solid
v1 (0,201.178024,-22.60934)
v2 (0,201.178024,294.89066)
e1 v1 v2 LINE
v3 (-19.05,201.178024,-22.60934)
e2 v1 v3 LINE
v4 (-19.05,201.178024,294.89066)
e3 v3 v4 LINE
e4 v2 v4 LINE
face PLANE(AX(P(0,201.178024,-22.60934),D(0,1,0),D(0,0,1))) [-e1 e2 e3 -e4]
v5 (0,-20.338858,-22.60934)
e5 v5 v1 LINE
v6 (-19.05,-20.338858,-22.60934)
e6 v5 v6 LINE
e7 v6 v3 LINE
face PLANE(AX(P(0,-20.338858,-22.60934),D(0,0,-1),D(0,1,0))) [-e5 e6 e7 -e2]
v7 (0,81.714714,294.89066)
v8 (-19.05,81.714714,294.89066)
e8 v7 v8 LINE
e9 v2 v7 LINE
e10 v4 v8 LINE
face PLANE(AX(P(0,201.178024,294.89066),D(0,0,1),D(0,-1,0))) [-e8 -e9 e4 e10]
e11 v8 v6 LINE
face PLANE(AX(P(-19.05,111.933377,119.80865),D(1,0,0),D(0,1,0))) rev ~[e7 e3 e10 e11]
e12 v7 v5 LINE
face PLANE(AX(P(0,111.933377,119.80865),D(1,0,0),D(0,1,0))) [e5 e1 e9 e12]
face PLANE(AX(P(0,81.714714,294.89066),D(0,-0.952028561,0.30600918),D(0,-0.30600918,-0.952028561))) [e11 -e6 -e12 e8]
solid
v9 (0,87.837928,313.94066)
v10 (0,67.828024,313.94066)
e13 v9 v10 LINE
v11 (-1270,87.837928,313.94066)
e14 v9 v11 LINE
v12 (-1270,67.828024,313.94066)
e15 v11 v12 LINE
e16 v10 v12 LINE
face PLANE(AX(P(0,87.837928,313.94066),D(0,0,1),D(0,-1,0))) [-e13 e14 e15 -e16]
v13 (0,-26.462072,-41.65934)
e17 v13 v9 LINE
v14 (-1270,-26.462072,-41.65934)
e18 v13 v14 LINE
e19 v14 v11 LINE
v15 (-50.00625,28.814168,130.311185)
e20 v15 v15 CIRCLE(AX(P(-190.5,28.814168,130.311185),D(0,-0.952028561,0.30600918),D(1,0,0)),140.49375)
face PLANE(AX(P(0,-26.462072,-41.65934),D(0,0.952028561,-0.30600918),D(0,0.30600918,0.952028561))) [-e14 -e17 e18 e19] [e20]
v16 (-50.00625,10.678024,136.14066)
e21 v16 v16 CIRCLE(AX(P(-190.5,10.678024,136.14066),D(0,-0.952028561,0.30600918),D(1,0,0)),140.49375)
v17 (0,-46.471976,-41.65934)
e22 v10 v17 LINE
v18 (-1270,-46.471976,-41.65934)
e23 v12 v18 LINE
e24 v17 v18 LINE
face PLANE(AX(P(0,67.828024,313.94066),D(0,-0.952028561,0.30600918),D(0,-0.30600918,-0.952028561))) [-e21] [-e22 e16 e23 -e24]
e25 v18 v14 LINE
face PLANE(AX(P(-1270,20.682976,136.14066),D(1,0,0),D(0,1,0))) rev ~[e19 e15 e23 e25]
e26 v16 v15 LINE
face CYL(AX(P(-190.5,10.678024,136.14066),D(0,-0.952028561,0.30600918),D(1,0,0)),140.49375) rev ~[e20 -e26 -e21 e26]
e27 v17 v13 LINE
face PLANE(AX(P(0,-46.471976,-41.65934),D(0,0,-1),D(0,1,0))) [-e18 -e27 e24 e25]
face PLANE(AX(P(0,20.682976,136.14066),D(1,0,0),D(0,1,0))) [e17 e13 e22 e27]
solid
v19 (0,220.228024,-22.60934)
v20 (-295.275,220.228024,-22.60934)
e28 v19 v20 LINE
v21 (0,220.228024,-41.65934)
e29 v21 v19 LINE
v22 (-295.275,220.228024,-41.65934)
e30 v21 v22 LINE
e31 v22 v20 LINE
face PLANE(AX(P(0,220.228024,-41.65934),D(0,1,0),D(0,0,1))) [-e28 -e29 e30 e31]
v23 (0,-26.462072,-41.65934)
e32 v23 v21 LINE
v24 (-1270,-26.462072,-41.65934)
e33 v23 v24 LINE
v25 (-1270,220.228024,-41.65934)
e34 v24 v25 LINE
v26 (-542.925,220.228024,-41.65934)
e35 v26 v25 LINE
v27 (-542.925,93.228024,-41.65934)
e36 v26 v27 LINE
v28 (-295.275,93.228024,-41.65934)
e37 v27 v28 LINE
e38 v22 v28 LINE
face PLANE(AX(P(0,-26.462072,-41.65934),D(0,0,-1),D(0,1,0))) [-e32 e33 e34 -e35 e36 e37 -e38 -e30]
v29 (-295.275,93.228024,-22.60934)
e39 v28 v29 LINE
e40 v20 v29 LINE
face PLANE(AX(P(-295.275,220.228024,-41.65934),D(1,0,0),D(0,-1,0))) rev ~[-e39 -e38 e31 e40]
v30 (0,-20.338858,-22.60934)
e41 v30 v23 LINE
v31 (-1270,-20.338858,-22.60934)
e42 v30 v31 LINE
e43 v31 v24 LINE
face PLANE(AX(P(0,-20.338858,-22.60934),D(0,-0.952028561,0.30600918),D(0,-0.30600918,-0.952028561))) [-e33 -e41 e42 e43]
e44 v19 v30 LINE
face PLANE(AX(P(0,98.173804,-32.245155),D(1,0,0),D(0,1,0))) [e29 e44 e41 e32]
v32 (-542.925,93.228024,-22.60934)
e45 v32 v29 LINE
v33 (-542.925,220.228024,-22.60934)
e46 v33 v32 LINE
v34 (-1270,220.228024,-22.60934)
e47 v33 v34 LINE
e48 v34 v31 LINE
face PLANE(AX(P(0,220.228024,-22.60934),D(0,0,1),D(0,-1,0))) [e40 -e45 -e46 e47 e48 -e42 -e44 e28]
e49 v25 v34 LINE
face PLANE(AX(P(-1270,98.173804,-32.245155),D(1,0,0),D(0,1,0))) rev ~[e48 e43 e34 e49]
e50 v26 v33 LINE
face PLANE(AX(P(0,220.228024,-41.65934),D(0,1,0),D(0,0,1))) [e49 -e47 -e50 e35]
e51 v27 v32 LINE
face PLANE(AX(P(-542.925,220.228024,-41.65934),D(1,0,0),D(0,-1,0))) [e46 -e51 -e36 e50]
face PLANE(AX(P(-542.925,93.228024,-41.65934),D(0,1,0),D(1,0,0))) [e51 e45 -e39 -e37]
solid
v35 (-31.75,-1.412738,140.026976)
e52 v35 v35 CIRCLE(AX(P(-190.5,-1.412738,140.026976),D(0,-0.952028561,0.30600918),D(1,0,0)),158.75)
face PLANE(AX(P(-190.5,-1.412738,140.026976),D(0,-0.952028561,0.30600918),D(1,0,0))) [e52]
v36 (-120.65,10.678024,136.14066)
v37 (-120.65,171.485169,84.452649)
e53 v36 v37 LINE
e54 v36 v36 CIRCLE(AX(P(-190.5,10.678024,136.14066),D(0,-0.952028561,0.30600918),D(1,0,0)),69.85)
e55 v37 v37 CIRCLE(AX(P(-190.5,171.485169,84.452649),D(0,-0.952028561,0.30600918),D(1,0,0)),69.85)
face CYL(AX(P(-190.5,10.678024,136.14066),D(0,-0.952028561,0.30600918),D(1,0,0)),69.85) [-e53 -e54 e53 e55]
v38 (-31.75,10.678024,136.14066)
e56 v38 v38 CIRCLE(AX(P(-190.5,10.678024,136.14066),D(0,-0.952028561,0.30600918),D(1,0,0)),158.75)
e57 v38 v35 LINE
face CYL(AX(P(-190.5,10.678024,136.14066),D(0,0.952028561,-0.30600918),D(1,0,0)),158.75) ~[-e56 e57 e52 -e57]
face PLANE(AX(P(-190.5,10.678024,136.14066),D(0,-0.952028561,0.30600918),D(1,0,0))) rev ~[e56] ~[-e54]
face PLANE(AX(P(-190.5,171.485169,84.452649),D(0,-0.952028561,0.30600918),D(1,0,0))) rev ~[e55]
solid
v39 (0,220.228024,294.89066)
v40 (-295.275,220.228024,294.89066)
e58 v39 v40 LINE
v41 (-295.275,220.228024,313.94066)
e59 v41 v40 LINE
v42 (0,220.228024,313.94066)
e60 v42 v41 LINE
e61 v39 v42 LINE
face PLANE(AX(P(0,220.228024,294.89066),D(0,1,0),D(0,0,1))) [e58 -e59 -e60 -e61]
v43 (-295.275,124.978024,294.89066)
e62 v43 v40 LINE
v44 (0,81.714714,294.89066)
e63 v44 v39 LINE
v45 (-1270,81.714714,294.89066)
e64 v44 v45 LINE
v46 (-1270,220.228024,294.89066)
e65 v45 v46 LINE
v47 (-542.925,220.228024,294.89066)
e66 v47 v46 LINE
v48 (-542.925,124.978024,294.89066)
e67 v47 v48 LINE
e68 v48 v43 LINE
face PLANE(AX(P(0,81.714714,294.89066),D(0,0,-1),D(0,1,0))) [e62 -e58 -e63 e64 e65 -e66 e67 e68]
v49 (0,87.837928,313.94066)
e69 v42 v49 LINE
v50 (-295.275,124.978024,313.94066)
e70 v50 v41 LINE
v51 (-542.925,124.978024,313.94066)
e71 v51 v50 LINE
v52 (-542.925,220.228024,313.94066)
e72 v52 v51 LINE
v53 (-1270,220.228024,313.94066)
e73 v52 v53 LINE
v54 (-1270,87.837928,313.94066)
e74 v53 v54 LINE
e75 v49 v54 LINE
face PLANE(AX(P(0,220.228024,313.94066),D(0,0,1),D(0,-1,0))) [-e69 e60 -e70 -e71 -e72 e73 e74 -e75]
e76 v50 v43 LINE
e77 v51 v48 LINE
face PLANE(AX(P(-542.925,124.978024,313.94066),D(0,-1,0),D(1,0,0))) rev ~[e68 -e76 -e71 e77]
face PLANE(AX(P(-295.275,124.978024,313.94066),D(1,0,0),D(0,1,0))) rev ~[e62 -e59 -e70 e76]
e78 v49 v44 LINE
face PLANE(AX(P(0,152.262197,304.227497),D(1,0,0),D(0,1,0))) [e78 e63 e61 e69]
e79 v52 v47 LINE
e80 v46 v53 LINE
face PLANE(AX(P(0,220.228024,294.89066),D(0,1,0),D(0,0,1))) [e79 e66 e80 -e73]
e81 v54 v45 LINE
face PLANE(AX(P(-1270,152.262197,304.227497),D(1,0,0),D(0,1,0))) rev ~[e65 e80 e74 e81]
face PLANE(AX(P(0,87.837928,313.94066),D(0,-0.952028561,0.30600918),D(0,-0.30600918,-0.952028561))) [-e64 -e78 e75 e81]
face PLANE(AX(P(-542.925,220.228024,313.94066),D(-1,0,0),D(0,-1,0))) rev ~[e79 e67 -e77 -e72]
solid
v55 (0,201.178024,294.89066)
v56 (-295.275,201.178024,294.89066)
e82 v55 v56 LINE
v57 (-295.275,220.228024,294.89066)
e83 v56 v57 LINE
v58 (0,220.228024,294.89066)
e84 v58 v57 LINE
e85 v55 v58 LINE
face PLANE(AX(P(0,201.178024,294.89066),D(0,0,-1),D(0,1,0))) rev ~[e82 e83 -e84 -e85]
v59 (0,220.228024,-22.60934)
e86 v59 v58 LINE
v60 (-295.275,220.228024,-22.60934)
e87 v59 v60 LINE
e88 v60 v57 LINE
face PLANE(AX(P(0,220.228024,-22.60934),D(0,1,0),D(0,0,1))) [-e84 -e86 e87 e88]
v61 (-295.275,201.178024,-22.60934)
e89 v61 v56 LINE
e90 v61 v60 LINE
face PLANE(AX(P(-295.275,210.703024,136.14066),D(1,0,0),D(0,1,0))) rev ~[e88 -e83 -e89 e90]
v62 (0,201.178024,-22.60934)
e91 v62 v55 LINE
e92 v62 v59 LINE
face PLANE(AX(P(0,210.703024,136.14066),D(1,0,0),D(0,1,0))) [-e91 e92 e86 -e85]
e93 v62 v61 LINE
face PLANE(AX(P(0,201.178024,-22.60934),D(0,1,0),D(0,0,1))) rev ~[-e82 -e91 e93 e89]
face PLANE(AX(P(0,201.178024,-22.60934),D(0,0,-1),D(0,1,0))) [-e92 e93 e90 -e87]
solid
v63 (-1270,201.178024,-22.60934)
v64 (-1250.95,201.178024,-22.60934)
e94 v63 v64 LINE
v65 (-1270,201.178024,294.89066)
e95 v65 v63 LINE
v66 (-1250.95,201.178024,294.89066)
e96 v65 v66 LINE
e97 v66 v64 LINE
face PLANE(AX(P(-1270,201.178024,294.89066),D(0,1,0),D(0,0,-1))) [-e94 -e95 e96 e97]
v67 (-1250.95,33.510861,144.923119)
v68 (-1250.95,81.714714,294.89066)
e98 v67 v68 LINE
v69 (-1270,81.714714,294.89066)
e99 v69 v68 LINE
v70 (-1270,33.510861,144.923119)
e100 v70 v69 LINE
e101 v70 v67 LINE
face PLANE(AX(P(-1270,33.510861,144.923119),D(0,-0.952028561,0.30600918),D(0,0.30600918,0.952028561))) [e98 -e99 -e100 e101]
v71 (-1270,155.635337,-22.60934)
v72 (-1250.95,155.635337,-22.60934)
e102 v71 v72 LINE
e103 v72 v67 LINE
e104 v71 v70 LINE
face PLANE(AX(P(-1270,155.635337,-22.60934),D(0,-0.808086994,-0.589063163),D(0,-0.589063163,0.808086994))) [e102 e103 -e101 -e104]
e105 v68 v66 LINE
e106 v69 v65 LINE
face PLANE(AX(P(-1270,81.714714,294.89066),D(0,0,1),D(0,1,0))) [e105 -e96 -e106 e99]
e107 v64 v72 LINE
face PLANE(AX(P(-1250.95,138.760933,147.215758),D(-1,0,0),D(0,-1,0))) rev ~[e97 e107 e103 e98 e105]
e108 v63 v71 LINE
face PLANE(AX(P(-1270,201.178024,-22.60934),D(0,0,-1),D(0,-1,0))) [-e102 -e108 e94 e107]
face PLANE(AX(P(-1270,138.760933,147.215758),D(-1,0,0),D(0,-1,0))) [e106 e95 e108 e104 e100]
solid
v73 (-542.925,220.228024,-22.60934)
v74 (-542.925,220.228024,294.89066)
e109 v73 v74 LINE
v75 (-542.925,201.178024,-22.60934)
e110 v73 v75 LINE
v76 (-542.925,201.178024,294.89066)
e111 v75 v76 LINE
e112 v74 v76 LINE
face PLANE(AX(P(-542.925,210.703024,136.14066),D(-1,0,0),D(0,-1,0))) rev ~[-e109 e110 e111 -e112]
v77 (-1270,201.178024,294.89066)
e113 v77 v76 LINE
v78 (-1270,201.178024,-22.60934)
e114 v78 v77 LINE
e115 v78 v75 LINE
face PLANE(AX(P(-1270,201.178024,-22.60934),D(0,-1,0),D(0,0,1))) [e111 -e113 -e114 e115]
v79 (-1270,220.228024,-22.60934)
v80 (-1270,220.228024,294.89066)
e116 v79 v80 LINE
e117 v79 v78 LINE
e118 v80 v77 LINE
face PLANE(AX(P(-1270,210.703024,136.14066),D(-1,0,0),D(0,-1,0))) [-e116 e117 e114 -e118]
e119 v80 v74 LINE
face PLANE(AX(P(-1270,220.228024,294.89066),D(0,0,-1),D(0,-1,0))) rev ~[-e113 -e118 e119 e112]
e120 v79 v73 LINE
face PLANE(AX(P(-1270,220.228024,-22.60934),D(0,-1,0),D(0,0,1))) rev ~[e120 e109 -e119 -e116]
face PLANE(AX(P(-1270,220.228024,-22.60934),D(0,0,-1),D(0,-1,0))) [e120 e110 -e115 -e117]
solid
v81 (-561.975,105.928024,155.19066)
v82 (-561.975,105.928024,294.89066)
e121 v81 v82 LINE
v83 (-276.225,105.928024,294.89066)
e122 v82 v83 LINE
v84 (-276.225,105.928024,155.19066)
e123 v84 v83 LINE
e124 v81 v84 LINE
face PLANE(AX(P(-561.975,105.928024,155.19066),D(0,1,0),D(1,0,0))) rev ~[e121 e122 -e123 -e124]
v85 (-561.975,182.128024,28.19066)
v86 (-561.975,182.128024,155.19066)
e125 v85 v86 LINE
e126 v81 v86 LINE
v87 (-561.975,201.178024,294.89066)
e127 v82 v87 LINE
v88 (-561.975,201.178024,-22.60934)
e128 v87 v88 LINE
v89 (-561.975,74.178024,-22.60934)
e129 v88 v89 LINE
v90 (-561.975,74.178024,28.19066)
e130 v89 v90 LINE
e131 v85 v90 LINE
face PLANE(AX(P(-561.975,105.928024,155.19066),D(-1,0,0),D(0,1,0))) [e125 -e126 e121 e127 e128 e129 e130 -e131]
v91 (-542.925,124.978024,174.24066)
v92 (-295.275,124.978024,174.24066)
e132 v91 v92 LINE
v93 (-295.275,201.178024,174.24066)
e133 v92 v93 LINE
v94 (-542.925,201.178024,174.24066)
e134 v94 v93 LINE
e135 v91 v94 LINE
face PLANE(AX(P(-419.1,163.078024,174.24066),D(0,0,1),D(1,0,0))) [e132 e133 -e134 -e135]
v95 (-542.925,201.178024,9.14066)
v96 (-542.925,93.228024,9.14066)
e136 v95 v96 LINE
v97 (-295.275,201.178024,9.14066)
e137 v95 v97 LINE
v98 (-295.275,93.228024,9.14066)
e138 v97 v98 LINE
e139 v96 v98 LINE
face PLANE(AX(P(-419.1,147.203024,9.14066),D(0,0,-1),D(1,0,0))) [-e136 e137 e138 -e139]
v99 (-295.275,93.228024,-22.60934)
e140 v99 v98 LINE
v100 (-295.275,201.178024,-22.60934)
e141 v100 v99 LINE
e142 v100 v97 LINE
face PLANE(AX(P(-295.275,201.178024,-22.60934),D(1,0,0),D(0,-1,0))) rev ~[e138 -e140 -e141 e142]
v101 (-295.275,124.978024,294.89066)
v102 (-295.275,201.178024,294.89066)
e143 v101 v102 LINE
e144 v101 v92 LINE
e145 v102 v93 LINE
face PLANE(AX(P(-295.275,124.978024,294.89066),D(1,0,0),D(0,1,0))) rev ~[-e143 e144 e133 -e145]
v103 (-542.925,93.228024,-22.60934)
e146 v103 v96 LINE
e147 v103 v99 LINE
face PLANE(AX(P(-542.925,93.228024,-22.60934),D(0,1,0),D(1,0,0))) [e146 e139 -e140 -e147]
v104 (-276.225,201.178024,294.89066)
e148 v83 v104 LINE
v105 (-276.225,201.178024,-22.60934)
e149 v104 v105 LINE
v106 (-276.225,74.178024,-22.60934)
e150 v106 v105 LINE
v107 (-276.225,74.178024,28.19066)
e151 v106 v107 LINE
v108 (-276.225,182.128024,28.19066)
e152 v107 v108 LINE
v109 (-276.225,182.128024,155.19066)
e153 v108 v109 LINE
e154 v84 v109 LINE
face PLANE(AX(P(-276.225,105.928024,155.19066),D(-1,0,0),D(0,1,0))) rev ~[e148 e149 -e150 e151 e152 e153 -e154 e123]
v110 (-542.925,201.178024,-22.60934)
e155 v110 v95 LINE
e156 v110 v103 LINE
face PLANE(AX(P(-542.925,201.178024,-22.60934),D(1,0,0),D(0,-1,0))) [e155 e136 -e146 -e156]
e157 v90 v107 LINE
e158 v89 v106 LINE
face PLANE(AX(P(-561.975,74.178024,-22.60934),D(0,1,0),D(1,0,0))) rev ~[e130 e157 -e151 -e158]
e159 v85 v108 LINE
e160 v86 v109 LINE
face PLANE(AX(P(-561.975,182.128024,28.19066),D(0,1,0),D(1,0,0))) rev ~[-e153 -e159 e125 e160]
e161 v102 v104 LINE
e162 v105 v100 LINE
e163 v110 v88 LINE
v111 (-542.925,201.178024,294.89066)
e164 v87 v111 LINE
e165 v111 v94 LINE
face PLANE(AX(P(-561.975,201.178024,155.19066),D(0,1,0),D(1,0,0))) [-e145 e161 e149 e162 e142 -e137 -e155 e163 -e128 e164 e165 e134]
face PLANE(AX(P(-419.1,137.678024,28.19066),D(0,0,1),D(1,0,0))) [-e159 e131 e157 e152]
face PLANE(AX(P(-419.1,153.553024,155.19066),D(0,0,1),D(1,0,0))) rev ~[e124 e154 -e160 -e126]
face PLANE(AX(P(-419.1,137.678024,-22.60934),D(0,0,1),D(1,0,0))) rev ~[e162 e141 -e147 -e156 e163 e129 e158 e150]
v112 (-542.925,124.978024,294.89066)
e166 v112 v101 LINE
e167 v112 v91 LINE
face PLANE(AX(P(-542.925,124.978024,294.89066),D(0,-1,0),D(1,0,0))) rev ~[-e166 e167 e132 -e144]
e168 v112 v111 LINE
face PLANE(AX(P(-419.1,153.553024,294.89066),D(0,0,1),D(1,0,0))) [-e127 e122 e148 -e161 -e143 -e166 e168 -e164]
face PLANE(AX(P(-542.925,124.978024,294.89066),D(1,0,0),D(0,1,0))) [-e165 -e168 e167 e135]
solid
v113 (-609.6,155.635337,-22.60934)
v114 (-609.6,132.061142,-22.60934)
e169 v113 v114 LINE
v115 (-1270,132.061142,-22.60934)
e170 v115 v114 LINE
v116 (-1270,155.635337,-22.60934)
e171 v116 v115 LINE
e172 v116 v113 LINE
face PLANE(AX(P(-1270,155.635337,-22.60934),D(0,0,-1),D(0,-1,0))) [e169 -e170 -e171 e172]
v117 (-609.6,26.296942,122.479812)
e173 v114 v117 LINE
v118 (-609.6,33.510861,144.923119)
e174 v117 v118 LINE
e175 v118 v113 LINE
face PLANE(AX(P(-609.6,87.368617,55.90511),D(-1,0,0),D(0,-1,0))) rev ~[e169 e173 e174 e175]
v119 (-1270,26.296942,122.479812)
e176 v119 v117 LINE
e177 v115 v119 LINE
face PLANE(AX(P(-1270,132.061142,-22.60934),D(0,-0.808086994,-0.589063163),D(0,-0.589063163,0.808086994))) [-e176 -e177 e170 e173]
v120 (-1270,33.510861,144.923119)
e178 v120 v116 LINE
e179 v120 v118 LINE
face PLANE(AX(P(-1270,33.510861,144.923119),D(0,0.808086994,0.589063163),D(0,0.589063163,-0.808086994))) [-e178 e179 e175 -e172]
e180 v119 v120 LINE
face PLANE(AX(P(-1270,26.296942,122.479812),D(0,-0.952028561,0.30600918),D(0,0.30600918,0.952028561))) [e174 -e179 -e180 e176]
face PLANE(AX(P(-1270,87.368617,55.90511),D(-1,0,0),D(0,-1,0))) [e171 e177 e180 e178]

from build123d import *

# Parameters (mm, degrees)
F1_DEPTH  = 1270
F0_W      = 19.05
F0_H      = 317.5
F2_DEPTH  = 295.275
F3_W      = 19.05
F3_H      = 317.5
F4_DEPTH  = 727.075
F6_DEPTH  = 50.8
F7_W      = 285.75
F7_H      = 19.05
F8_DEPTH  = 127
F9_W      = 285.75
F9_H      = 95.25
F10_DEPTH = 139.7
F11_DEPTH = 1270
F12_DEPTH = 1270
F13_R     = 140.49375
F14_DEPTH = 25.4
F15_R     = 69.85
F16_DEPTH = 168.91
F17_R     = 158.75
F18_DEPTH = 12.7
F19_DEPTH = 19.05
F21_DEPTH = 19.05
F22_DEPTH = 660.4
F23_W     = 247.65
F23_H     = 127
F24_DEPTH = 19.05
F25_W     = 247.65
F25_H     = 107.95
F26_DEPTH = 31.75
F28_DEPTH = 19.05
F29_W     = 247.65
F29_H     = 76.2
F30_DEPTH = 120.65


with BuildPart() as f1:
    # F0 (on Right) → F1 (new body)
    with BuildSketch(Plane.YZ):
        Polygon((-20.3388575805, -22.6093402624), (-26.4620718662, -41.6593402624), (220.2280242562, -41.6593402624), (220.2280242562, -22.6093402624), (201.1780242562, -22.6093402624), align=None)
    extrude(amount=-F1_DEPTH)

    # F23 (on face) → F24 (cut)
    with BuildSketch(Plane(origin=(0, 0, -41.6593402624), x_dir=(1, 0, 0), z_dir=(0, 0, -1))):
        with Locations((-419.1, -156.7280242562)):
            Rectangle(F23_W, F23_H)
    extrude(amount=-F24_DEPTH, mode=Mode.SUBTRACT)


with BuildPart() as f2:
    # F0 (on Right) → F2 (new body)
    with BuildSketch(Plane.YZ):
        with Locations((210.7030242562, 136.1406597376)):
            Rectangle(F0_W, F0_H)
    extrude(amount=-F2_DEPTH)


with BuildPart() as f4:
    # F3 (on face) → F4 (new body)
    with BuildSketch(Plane(origin=(-1270, 0, 0), x_dir=(0, -1, 0), z_dir=(-1, 0, 0))):
        with Locations((-210.7030242562, 136.1406597376)):
            Rectangle(F3_W, F3_H)
    extrude(amount=-F4_DEPTH)


with BuildPart() as f6:
    # F5 (on face) → F6 (new body)
    with BuildSketch(Plane.XY.offset(-22.6093402624)):
        Polygon((-276.225, 201.1780242562), (-542.925, 201.1780242562), (-561.975, 201.1780242562), (-561.975, 74.1780242562), (-276.225, 74.1780242562), align=None)
    extrude(amount=F6_DEPTH)

    # F7 (on face) → F8 (join)
    with BuildSketch(Plane.XY.offset(28.1906597376)):
        with Locations((-419.1, 191.6530242562)):
            Rectangle(F7_W, F7_H)
    extrude(amount=F8_DEPTH)

    # F9 (on face) → F10 (join)
    with BuildSketch(Plane.XY.offset(155.1906597376)):
        with Locations((-419.1, 153.5530242562)):
            Rectangle(F9_W, F9_H)
    extrude(amount=F10_DEPTH)

    # F25 (on face) → F26 (cut)
    with BuildSketch(Plane(origin=(0, 0, -22.6093402624), x_dir=(1, 0, 0), z_dir=(0, 0, -1))):
        with Locations((-419.1, -147.2030242562)):
            Rectangle(F25_W, F25_H)
    extrude(amount=-F26_DEPTH, mode=Mode.SUBTRACT)

    # F29 (on face) → F30 (cut)
    with BuildSketch(Plane.XY.offset(294.8906597376)):
        with Locations((-419.1, 163.0780242562)):
            Rectangle(F29_W, F29_H)
    extrude(amount=-F30_DEPTH, mode=Mode.SUBTRACT)


with BuildPart() as f11:
    # F0 (on Right) → F11 (new body)
    with BuildSketch(Plane.YZ):
        Polygon((220.2280242562, 313.9406597376), (87.8379281338, 313.9406597376), (81.7147138481, 294.8906597376), (201.1780242562, 294.8906597376), (220.2280242562, 294.8906597376), align=None)
    extrude(amount=-F11_DEPTH)

    # F27 (on face) → F28 (cut)
    with BuildSketch(Plane.XY.offset(313.9406597376)):
        Polygon((-542.925, 201.1780242562), (-542.925, 124.9780242562), (-295.275, 124.9780242562), (-295.275, 201.1780242562), (-295.275, 220.2280242562), (-542.925, 220.2280242562), align=None)
    extrude(amount=-F28_DEPTH, mode=Mode.SUBTRACT)


with BuildPart() as f12:
    # F0 (on Right) → F12 (new body)
    with BuildSketch(Plane.YZ):
        Polygon((67.8280242562, 313.9406597376), (-46.4719757438, -41.6593402624), (-26.4620718662, -41.6593402624), (-20.3388575805, -22.6093402624), (81.7147138481, 294.8906597376), (87.8379281338, 313.9406597376), align=None)
    extrude(amount=-F12_DEPTH)

    # F13 (on face) → F14 (cut)
    with BuildSketch(Plane(origin=(0, -29.9836707942, 9.6376084696), x_dir=(1, 0, 0), z_dir=(0, -0.9520285613, 0.3060091804))):
        with Locations((-190.5, 132.8773698735)):
            Circle(F13_R)
    extrude(amount=-F14_DEPTH, mode=Mode.SUBTRACT)


with BuildPart() as f16:
    # F15 (on face) → F16 (new body)
    with BuildSketch(Plane(origin=(0, -29.9836707942, 9.6376084696), x_dir=(1, 0, 0), z_dir=(0, -0.9520285613, 0.3060091804))):
        with Locations((-190.5, 132.8773698735)):
            Circle(F15_R)
    extrude(amount=-F16_DEPTH)

    # F17 (on face) → F18 (join)
    with BuildSketch(Plane(origin=(0, -29.9836707942, 9.6376084696), x_dir=(1, 0, 0), z_dir=(0, -0.9520285613, 0.3060091804))):
        with Locations((-190.5, 132.8773698735)):
            Circle(F17_R)
    extrude(amount=F18_DEPTH)


with BuildPart() as f19:
    # F0 (on Right) → F19 (new body)
    with BuildSketch(Plane.YZ):
        Polygon((81.7147138481, 294.8906597376), (-20.3388575805, -22.6093402624), (201.1780242562, -22.6093402624), (201.1780242562, 294.8906597376), align=None)
    extrude(amount=-F19_DEPTH)


with BuildPart() as f21:
    # F20 (on face) → F21 (new body)
    with BuildSketch(Plane(origin=(-1270, 0, 0), x_dir=(0, -1, 0), z_dir=(-1, 0, 0))):
        Polygon((-201.1780242562, -22.6093402624), (-155.6353369512, -22.6093402624), (-33.510861462, 144.923118981), (-81.7147138481, 294.8906597376), (-201.1780242562, 294.8906597376), align=None)
    extrude(amount=-F21_DEPTH)


with BuildPart() as f22:
    # F20 (on face) → F22 (new body)
    with BuildSketch(Plane(origin=(-1270, 0, 0), x_dir=(0, -1, 0), z_dir=(-1, 0, 0))):
        Polygon((-155.6353369512, -22.6093402624), (-132.0611424195, -22.6093402624), (-26.2969415145, 122.4798124775), (-33.510861462, 144.923118981), align=None)
    extrude(amount=-F22_DEPTH)


solid = Compound([f1.part, f2.part, f4.part, f6.part, f11.part, f12.part, f16.part, f19.part, f21.part, f22.part])
